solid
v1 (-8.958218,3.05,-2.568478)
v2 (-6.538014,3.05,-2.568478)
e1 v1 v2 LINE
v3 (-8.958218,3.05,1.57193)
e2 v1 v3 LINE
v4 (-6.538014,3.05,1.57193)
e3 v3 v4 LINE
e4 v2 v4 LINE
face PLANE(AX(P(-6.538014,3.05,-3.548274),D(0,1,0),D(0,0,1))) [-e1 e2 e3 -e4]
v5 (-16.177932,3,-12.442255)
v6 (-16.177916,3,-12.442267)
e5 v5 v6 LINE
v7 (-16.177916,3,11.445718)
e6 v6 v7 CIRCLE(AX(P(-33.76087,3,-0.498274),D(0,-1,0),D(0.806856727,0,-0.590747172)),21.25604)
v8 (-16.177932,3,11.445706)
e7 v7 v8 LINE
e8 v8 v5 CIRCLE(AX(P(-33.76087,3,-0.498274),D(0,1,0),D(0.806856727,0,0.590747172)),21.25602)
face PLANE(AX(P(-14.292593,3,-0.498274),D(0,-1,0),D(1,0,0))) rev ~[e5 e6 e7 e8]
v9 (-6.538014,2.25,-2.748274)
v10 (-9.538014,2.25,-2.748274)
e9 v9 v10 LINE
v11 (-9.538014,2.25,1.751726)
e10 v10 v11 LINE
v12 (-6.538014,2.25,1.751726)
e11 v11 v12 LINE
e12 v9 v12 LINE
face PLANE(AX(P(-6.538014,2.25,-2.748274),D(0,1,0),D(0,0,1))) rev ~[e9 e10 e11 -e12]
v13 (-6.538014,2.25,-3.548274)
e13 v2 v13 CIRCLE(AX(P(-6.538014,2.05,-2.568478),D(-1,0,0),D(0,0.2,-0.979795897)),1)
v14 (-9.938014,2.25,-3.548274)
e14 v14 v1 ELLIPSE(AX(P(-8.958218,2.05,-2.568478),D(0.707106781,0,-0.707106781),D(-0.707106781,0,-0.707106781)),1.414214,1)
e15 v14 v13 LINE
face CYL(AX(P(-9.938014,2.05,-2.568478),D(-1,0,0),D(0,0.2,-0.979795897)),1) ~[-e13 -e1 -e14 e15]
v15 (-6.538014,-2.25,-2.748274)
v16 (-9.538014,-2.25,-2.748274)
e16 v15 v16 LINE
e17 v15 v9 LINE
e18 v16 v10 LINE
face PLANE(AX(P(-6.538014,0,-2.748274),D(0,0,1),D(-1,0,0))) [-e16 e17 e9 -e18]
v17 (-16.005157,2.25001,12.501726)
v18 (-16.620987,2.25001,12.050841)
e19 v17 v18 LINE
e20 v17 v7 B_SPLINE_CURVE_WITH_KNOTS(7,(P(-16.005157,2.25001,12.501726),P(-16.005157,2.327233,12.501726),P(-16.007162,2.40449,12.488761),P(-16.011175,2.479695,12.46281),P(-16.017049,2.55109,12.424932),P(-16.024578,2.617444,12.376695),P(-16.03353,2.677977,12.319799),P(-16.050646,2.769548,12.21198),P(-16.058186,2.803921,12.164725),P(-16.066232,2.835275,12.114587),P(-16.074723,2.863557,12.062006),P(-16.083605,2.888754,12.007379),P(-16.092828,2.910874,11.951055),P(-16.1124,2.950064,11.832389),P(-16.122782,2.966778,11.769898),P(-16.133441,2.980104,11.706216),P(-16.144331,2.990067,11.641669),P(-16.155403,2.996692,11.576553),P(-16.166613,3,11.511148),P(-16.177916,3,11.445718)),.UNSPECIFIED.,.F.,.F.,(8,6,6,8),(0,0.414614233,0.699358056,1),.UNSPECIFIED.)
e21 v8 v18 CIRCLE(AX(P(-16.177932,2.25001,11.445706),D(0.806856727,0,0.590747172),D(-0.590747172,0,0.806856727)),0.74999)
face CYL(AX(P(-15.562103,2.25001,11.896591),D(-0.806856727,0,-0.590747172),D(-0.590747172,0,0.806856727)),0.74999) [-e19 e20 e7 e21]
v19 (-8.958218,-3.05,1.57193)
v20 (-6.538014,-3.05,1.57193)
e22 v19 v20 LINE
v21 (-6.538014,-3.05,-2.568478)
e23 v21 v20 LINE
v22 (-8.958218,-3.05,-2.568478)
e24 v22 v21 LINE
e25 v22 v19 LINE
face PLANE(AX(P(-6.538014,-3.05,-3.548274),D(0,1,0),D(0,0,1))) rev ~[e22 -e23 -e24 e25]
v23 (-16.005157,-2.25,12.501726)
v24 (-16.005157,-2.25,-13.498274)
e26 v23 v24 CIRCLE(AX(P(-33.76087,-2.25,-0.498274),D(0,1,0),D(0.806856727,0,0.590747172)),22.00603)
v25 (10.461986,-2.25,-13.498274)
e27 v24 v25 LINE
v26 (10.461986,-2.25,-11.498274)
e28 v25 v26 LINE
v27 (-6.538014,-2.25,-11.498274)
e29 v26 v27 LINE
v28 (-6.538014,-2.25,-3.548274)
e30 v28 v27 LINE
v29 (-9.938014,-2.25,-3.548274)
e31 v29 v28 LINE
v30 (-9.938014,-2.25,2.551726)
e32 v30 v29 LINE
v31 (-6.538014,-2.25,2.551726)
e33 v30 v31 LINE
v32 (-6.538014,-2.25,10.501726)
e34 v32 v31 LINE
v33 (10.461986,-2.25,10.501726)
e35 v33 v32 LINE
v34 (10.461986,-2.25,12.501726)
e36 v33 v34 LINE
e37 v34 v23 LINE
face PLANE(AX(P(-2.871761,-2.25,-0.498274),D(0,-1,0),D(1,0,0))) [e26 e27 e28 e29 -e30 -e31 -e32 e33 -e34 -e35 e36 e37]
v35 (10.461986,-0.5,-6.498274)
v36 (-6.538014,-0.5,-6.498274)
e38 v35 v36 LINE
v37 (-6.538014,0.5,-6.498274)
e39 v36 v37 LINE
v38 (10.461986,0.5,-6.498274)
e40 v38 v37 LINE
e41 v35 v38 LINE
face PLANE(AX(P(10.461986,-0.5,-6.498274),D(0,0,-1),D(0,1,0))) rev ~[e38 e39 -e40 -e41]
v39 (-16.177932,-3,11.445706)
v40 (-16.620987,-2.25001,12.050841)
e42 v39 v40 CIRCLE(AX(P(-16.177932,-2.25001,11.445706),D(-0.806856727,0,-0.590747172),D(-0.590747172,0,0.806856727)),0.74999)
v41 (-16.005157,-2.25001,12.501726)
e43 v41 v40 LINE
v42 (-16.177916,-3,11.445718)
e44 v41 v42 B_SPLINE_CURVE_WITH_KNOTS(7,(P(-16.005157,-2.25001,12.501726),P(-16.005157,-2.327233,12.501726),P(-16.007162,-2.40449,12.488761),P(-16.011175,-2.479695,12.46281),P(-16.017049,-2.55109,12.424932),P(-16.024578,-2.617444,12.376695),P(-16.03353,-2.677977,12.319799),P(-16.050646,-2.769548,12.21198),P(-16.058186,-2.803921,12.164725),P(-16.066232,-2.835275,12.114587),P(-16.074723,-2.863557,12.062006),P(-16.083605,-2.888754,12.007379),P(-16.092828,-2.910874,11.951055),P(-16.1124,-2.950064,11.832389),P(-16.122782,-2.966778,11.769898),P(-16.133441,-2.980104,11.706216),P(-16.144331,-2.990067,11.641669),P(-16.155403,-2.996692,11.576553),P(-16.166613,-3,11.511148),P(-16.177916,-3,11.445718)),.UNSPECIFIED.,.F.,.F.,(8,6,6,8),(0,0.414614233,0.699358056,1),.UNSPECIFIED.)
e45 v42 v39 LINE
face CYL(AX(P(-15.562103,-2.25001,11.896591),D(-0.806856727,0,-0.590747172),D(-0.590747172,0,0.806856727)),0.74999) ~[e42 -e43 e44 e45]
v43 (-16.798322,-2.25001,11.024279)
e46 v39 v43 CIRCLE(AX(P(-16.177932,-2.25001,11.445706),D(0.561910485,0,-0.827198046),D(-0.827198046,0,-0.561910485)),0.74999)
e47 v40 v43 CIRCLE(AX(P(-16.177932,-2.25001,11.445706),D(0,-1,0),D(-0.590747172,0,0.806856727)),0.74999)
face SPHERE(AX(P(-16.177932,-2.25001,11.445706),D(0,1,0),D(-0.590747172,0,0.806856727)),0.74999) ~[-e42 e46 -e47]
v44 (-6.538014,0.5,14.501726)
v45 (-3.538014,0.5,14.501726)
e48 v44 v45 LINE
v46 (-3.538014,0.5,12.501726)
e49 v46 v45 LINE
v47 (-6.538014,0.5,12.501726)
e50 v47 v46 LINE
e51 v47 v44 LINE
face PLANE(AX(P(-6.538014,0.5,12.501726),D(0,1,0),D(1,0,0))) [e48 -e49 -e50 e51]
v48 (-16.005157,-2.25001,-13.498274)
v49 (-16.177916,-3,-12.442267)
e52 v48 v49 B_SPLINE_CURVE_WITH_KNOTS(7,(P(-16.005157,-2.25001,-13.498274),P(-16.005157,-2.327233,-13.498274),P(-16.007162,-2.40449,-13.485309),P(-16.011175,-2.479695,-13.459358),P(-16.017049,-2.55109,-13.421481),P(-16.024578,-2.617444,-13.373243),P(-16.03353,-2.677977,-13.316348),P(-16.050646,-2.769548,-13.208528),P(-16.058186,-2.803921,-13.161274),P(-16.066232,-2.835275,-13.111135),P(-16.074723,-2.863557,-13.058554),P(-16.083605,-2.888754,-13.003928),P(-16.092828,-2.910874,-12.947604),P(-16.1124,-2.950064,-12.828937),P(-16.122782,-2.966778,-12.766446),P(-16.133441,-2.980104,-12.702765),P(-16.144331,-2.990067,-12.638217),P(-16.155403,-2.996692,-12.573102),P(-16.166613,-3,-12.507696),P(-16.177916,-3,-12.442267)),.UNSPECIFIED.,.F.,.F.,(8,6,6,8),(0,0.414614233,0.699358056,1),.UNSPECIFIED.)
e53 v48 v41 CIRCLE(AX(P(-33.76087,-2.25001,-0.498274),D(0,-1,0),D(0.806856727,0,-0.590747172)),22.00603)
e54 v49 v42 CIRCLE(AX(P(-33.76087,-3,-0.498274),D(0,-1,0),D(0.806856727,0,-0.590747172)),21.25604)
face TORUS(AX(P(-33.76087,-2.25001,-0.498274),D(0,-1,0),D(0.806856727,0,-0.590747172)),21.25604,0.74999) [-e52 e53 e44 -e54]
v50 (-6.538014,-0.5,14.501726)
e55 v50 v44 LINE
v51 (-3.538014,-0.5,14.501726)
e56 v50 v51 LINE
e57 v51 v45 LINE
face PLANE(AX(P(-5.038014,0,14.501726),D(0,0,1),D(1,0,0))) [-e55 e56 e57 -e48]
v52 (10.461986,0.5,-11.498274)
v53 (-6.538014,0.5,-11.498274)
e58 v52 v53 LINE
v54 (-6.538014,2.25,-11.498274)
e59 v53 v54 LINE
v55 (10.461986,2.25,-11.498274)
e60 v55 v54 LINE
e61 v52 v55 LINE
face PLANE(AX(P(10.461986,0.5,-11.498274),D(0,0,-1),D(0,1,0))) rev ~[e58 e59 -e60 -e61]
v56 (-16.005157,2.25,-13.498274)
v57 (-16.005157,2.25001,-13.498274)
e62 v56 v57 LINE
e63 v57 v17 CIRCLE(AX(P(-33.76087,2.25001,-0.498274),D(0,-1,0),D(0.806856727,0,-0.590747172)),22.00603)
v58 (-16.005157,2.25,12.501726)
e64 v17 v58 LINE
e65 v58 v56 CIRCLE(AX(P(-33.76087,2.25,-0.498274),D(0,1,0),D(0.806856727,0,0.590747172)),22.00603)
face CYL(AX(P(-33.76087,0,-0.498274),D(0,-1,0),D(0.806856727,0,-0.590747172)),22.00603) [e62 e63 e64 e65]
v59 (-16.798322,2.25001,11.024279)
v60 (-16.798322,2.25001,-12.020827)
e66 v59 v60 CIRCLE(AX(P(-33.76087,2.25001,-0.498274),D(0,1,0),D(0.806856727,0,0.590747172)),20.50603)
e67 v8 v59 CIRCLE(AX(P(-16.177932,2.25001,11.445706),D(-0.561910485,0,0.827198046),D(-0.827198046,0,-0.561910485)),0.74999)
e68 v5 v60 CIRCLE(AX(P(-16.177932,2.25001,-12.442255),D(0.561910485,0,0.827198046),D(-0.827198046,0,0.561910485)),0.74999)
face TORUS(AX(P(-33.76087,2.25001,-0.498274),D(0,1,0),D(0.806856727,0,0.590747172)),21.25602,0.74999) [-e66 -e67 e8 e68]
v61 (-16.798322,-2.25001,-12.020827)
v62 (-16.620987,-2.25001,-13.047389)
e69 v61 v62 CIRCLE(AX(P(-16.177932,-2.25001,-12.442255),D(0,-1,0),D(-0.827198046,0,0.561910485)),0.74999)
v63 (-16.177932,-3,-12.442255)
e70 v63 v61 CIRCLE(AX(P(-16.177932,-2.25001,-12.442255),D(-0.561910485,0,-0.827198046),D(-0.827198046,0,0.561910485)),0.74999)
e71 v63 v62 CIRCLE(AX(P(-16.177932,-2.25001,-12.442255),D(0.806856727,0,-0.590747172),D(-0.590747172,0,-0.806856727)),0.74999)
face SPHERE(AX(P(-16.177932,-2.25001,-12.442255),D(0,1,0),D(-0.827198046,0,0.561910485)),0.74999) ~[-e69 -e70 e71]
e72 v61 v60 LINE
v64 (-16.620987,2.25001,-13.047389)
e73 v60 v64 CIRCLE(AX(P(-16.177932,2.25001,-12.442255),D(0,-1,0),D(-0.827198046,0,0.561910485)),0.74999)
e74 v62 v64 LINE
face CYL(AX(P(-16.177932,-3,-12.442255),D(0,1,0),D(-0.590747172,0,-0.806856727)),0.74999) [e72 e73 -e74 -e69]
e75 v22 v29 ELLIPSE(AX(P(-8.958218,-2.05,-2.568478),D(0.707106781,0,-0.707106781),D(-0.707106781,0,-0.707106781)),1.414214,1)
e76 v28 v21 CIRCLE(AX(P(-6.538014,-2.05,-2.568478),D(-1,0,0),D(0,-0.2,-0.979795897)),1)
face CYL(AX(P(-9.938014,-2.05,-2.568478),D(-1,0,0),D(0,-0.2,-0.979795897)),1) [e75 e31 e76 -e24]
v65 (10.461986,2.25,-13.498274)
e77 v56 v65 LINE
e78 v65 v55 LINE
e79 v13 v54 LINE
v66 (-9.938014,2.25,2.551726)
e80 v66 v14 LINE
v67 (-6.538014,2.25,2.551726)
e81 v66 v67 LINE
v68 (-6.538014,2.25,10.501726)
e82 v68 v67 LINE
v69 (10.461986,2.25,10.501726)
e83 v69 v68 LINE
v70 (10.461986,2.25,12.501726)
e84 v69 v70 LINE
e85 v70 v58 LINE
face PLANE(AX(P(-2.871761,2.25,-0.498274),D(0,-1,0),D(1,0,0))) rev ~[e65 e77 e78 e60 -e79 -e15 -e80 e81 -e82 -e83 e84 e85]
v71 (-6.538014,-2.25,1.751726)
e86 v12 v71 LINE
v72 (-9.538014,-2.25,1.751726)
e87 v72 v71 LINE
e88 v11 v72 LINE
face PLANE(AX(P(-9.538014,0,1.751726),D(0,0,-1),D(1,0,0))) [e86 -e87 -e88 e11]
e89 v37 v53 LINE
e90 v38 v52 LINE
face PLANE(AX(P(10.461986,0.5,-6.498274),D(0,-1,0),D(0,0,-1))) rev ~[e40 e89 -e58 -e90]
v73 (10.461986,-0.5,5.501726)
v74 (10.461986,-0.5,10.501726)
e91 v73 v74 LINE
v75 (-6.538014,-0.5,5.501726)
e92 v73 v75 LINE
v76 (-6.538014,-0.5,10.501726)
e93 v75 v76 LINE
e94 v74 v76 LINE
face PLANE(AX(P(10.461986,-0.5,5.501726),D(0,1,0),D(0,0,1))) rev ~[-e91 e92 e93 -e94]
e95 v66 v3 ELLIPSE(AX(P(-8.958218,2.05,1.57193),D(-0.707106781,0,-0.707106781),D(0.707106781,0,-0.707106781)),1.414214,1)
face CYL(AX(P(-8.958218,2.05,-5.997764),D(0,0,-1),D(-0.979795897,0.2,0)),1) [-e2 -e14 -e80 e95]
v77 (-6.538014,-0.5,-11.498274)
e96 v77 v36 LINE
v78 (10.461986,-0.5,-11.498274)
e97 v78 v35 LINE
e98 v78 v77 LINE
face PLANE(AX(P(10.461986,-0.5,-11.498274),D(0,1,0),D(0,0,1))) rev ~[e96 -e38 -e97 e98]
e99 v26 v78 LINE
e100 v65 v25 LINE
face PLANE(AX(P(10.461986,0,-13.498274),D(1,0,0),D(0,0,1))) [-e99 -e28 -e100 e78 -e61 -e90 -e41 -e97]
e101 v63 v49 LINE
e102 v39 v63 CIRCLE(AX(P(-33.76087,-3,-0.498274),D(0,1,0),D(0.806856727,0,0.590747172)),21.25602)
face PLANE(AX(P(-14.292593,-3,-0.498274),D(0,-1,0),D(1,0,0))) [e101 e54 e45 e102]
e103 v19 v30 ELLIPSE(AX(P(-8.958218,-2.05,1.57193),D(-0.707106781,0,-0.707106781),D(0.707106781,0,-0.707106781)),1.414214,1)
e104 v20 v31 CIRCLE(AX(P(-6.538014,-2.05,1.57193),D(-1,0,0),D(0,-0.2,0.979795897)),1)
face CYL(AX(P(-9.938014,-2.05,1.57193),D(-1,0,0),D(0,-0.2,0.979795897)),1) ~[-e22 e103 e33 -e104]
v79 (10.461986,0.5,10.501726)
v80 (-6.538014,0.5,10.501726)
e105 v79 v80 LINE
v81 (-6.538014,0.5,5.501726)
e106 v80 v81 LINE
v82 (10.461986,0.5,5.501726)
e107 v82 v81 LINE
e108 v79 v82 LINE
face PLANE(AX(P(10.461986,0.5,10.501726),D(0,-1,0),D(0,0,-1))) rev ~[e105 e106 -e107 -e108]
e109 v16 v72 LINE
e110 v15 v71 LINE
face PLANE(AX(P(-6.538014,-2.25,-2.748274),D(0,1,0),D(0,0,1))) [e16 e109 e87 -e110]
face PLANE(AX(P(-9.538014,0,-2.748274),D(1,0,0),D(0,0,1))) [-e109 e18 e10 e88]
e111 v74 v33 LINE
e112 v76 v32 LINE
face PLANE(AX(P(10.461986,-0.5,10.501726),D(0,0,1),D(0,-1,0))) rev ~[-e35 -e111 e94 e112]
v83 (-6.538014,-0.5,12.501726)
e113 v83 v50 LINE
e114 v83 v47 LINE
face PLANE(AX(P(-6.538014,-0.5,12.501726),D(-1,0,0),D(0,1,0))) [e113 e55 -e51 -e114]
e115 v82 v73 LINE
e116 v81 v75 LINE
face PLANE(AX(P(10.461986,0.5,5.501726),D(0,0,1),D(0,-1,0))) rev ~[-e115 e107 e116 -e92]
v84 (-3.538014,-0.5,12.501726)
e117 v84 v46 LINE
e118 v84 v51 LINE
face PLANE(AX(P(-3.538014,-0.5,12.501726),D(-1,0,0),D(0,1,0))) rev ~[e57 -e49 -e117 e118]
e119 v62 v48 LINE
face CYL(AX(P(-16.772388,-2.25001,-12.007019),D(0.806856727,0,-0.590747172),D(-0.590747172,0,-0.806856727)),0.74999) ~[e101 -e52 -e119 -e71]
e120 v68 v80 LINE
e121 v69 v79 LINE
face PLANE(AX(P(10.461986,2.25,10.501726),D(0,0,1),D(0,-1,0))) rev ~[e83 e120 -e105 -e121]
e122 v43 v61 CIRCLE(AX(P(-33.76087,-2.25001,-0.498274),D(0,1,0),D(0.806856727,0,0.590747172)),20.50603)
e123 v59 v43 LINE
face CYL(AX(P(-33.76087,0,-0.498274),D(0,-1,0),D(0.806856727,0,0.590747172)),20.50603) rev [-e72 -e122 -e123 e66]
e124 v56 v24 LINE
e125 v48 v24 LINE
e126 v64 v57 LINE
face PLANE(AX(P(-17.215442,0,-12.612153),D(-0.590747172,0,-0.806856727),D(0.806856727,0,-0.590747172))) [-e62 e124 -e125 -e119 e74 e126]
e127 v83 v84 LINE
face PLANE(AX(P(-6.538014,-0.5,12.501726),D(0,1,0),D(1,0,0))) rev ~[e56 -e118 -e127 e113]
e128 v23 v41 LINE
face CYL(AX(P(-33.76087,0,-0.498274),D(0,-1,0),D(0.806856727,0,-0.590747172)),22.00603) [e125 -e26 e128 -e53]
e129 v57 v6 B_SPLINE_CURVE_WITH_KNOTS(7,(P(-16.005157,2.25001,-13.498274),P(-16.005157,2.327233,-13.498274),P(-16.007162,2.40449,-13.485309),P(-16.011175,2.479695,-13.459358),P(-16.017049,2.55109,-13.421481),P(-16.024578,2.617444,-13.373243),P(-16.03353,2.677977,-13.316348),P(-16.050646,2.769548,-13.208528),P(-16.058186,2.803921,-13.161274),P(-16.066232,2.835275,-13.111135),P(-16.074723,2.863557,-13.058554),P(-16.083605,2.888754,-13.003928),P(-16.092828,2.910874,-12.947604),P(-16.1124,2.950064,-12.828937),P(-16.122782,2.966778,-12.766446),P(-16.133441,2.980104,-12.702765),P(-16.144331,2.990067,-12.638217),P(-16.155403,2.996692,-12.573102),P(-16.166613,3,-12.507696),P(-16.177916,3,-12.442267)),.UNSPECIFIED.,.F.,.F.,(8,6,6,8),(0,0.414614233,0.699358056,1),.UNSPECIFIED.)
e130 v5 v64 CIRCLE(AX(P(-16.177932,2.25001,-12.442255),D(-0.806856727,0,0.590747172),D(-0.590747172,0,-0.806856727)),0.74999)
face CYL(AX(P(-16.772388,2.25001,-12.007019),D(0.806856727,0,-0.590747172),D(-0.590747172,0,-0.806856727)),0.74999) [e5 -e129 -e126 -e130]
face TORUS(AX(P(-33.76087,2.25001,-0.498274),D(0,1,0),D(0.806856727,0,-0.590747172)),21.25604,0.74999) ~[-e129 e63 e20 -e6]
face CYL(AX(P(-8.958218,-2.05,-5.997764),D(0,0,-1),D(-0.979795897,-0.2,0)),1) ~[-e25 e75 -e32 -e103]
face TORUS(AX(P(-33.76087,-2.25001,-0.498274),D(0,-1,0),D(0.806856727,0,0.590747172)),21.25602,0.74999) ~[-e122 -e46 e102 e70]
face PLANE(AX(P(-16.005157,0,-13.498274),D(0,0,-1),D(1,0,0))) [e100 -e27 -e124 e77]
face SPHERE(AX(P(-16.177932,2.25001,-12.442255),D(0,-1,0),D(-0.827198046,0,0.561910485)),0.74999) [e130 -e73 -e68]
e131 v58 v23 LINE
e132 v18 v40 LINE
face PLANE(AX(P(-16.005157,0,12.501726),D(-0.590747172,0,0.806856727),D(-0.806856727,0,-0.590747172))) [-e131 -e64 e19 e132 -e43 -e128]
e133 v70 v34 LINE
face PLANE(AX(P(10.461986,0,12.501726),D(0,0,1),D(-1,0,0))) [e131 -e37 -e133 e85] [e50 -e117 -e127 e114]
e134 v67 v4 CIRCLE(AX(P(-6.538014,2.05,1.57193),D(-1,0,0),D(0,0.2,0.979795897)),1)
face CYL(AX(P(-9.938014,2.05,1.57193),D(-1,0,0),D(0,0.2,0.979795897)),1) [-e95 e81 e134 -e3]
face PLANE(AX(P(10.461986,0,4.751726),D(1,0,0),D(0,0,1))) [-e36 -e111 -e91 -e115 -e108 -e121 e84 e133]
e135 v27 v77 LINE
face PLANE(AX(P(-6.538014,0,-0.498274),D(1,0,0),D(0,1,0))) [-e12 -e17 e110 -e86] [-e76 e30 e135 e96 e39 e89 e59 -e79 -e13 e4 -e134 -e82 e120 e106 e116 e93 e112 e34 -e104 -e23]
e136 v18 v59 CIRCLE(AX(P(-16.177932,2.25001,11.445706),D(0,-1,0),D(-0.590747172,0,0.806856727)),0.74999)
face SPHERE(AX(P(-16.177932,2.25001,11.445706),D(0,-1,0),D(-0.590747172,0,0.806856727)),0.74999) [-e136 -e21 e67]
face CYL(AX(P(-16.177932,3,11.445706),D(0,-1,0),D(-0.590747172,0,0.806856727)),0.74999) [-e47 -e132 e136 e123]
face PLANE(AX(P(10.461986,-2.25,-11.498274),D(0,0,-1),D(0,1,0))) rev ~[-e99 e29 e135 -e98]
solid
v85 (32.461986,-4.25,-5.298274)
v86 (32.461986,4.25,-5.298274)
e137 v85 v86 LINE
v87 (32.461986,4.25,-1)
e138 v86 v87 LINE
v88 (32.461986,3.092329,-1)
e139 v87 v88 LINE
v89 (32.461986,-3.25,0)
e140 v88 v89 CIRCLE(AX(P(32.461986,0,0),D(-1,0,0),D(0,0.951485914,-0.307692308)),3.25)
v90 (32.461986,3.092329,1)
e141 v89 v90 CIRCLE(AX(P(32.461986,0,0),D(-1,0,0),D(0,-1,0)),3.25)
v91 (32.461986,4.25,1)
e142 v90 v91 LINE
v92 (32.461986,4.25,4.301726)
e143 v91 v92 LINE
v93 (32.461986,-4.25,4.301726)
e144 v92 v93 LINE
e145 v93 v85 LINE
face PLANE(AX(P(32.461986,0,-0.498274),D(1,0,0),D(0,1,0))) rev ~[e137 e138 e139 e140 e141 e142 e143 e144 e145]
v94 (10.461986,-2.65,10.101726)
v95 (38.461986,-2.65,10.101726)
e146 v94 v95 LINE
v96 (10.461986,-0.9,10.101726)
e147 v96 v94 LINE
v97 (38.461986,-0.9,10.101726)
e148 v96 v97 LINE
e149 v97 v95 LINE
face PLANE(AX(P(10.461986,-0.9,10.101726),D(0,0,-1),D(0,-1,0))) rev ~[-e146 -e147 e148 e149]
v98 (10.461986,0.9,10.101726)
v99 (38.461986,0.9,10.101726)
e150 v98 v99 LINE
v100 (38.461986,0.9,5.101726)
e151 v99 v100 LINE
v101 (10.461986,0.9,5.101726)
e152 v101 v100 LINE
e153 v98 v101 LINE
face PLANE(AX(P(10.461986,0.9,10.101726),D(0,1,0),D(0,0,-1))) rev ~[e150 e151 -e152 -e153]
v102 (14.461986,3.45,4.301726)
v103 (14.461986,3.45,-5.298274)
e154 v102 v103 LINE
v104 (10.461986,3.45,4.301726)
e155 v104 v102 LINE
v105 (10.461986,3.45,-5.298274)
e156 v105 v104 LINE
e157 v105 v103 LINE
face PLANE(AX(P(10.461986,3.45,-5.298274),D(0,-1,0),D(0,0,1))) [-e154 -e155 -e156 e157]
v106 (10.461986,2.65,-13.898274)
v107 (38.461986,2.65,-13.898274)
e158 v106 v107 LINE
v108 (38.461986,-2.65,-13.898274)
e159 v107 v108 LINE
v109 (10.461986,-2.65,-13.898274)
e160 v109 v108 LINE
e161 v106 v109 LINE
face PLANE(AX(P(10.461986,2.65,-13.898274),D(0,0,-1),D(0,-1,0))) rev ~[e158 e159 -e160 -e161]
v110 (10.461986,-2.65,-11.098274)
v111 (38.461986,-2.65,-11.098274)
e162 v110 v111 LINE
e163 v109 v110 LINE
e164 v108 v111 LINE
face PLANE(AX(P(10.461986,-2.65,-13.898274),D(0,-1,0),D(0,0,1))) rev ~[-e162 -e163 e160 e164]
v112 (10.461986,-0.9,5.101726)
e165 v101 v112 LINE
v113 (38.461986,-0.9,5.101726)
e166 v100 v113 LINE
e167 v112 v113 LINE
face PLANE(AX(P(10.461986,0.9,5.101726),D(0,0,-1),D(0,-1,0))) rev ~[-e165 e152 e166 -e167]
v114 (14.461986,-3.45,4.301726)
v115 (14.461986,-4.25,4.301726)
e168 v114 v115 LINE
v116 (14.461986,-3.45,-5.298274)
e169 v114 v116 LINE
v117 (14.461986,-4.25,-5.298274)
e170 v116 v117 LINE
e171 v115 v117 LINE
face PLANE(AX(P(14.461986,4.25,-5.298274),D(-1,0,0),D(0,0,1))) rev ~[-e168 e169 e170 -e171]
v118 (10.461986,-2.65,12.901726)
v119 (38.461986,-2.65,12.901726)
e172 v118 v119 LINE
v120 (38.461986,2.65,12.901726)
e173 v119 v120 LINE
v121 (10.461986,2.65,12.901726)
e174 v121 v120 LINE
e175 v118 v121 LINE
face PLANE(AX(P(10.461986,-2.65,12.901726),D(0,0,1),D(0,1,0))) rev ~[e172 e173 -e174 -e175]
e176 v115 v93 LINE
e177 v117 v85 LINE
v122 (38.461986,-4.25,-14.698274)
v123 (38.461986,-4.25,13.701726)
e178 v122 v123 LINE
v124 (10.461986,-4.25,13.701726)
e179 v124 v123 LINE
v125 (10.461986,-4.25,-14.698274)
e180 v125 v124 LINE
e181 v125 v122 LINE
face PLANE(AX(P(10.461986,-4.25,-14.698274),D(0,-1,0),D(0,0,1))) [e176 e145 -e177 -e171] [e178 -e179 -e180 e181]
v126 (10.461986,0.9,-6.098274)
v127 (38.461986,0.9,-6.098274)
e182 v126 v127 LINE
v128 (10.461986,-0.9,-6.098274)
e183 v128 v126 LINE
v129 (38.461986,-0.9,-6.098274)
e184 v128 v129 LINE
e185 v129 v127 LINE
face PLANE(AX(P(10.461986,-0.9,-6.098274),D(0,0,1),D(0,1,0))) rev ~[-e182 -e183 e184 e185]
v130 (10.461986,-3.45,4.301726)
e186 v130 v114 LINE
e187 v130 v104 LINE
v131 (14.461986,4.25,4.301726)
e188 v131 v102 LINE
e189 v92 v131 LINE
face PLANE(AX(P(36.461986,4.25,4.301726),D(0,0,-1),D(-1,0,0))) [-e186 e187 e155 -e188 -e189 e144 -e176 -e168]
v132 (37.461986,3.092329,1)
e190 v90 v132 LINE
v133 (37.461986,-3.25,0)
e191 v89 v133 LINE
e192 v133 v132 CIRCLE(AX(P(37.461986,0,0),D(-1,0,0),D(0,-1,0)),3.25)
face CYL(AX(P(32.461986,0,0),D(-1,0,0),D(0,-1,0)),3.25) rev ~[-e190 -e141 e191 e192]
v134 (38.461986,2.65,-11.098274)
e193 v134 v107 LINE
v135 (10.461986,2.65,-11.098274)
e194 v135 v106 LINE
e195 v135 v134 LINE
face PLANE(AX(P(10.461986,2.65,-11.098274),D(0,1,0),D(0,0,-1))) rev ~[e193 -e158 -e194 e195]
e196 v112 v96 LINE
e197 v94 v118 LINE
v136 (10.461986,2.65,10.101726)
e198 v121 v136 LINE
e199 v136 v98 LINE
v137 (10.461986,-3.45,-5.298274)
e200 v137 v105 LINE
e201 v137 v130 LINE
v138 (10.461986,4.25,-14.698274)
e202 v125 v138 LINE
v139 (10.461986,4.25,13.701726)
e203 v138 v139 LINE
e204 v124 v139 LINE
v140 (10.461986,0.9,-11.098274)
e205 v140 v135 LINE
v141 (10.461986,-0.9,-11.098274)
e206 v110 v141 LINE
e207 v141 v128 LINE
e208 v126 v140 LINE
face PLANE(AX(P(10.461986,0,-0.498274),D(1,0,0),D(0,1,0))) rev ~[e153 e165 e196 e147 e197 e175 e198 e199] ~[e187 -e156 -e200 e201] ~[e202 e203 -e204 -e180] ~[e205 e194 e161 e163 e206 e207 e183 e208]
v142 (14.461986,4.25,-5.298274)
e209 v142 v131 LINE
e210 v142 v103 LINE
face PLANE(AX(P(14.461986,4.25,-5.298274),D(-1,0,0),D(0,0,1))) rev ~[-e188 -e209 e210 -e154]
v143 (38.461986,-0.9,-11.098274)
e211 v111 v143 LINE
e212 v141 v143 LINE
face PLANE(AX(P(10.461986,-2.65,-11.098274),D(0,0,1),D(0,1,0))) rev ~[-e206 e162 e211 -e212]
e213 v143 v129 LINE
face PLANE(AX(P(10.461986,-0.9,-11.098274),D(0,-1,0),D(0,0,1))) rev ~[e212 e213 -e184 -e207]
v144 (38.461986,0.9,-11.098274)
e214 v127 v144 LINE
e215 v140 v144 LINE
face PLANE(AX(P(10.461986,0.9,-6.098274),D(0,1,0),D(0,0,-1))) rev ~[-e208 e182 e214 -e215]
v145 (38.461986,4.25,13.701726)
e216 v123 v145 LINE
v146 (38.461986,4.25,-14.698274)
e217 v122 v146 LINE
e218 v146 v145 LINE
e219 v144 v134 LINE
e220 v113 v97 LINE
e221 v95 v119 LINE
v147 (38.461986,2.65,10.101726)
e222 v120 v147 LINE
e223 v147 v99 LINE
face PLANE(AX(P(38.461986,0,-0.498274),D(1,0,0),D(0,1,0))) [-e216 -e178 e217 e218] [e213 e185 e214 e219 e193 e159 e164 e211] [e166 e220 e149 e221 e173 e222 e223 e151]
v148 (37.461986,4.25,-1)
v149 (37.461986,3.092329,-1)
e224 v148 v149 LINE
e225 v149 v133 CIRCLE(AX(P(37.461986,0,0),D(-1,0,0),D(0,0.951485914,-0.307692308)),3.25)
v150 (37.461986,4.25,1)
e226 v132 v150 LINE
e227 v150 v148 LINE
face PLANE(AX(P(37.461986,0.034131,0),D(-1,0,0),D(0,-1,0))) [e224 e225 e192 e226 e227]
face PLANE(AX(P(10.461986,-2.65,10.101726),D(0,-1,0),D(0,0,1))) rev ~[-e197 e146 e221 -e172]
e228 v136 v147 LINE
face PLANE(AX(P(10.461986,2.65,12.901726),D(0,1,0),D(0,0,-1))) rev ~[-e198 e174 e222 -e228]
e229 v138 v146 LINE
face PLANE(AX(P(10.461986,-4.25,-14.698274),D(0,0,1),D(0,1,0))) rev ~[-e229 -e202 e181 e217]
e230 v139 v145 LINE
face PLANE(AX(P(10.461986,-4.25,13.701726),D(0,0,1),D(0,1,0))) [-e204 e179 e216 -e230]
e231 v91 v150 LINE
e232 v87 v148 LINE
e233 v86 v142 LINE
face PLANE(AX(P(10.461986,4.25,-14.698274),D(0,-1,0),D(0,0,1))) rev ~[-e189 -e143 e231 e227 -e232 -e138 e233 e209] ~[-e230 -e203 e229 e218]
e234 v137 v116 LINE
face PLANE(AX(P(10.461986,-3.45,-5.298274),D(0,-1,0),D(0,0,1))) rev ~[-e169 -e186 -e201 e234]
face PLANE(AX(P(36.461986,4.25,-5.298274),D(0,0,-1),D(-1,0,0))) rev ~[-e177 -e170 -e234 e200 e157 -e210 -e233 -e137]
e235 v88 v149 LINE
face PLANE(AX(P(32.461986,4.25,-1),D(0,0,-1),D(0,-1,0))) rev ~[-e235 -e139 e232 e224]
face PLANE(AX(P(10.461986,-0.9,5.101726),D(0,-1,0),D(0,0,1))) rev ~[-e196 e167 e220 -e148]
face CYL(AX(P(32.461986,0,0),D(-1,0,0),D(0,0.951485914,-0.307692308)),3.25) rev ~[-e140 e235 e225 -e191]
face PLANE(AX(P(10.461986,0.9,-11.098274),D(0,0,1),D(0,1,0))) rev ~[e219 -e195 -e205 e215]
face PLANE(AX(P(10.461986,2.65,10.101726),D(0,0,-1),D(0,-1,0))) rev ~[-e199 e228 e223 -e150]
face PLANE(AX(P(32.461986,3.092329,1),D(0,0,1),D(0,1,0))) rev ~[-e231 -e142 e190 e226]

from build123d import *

# Parameters (mm, degrees)
F1_DEPTH    = 2.25
F2_W        = 6.1
F2_H        = 6.1
F2_W_2      = 4.5
F2_H_2      = 4.5
F3_DEPTH    = 3.4
F5_DEPTH    = 3
F6_R        = 0.74999
F7_T1_DEPTH = 10.9989794856
F7_T3_DEPTH = 5.8494897428
F9_DEPTH    = 17
F10_W       = 3
F10_H       = 1
F11_DEPTH   = 2
F12_W       = 8.5
F12_H       = 28.4
F12_W_2     = 6.9
F12_H_2     = 9.6
F13_DEPTH   = 28
F15_W       = 22
F15_H       = 9.6
F16_DEPTH   = 15.5
F17_DEPTH   = 6
F19_DEPTH   = 5


# Not quite as in the source:
# - a fillet or chamfer that OpenCascade refuses, or shapes differently, is made with other operations: its cross-section is extruded or revolved along the edge and cut away or added
# - a fillet or chamfer is up to 0.001 mm smaller than in the source, because OpenCascade refuses the exact size


with BuildPart() as f1:
    # F0 (on Front) → F1 (new body, symmetric)
    with BuildSketch(Plane.XZ):
        with BuildLine():
            Line((-9.5380139407, -2.7482741908), (-9.5380139407, 1.7517258092))
            Line((-9.5380139407, 1.7517258092), (-6.5380139407, 1.7517258092))
            Line((-6.5380139407, 1.7517258092), (-6.5380139407, 4.7517258092))
            Line((-6.5380139407, 4.7517258092), (10.4619860593, 4.7517258092))
            Line((10.4619860593, 4.7517258092), (10.4619860593, 12.5017258092))
            Line((10.4619860593, 12.5017258092), (-16.0051570773, 12.5017258092))
            ThreePointArc((-16.0051570773, 12.5017258092), (-11.7548404249, -0.4982741908), (-16.0051570773, -13.4982741908))
            Line((-16.0051570773, -13.4982741908), (10.4619860593, -13.4982741908))
            Line((10.4619860593, -13.4982741908), (10.4619860593, -5.7482741908))
            Line((10.4619860593, -5.7482741908), (-6.5380139407, -5.7482741908))
            Line((-6.5380139407, -5.7482741908), (-6.5380139407, -2.7482741908))
            Line((-6.5380139407, -2.7482741908), (-9.5380139407, -2.7482741908))
        make_face()
    extrude(amount=F1_DEPTH, both=True)

    # F2 (on face) → F3 (join)
    with BuildSketch(Plane.YZ.offset(-6.5380139407)):
        with Locations((0, -0.4982741908)):
            Rectangle(F2_W, F2_H)
        with Locations((0, -0.4982741908)):
            Rectangle(F2_W_2, F2_H_2, mode=Mode.SUBTRACT)
    extrude(amount=-F3_DEPTH)

    # F4 (on Front) → F5 (join, symmetric)
    with BuildSketch(Plane.XZ):
        with BuildLine():
            ThreePointArc((-16.0051570773, -13.4982741908), (-11.7548404249, -0.4982741908), (-16.0051570773, 12.5017258092))
            Line((-16.0051570773, 12.5017258092), (-17.2154421685, 11.6156050511))
            ThreePointArc((-17.2154421685, 11.6156050511), (-13.2548404249, -0.4982741908), (-17.2154421685, -12.6121534326))
            Line((-17.2154421685, -12.6121534326), (-16.0051570773, -13.4982741908))
        make_face()
    extrude(amount=F5_DEPTH, both=True)

    # F6 (radius 0.75 in the source; OpenCascade refuses exactly that, so slightly less here)
    f6_edges = [f1.edges().sort_by_distance(p)[0] for p in [
        (-16.6103, -3, 12.058665),
        (-13.25484, -3, -0.498274),
        (-16.6103, -3, -13.055214),
        (-11.75484, -3, -0.498274),
        (-16.6103, 3, 12.058665),
        (-13.25484, 3, -0.498274),
        (-16.6103, 3, -13.055214),
        (-11.75484, 3, -0.498274),
        (-17.215442, 0, -12.612153),
        (-17.215442, 0, 11.615605),
    ]]
    fillet(f6_edges, radius=F6_R)

    # F7: fillet of radius 1 on 6 edges, made by hand

    # F7_s2 → F7_t1 (cut)
    with BuildSketch(Plane.XY.offset(-5.9977639336)):
        with BuildLine():
            ThreePointArc((-9.9380139407, -2.25), (-9.5906735756, -2.8245966692), (-8.9582180436, -3.05))
            Line((-8.9582180436, -3.05), (-9.9380139407, -3.05))
            Line((-9.9380139407, -3.05), (-9.9380139407, -2.25))
        make_face()
        with BuildLine():
            ThreePointArc((-9.9380139407, 2.25), (-9.5906735756, 2.8245966692), (-8.9582180436, 3.05))
            Line((-8.9582180436, 3.05), (-9.9380139407, 3.05))
            Line((-9.9380139407, 3.05), (-9.9380139407, 2.25))
        make_face()
    extrude(amount=F7_T1_DEPTH, mode=Mode.SUBTRACT)

    # F7_s4 → F7_t3 (cut)
    with BuildSketch(Plane.YZ.offset(-9.9380139407)):
        with BuildLine():
            ThreePointArc((-2.25, -3.5482741908), (-2.8245966692, -3.2009338257), (-3.05, -2.5684782937))
            Line((-3.05, -2.5684782937), (-3.05, -3.5482741908))
            Line((-3.05, -3.5482741908), (-2.25, -3.5482741908))
        make_face()
        with BuildLine():
            ThreePointArc((-2.25, 2.5517258092), (-2.8245966692, 2.2043854441), (-3.05, 1.5719299121))
            Line((-3.05, 1.5719299121), (-3.05, 2.5517258092))
            Line((-3.05, 2.5517258092), (-2.25, 2.5517258092))
        make_face()
        with BuildLine():
            ThreePointArc((2.25, 2.5517258092), (2.8245966692, 2.2043854441), (3.05, 1.5719299121))
            Line((3.05, 1.5719299121), (3.05, 2.5517258092))
            Line((3.05, 2.5517258092), (2.25, 2.5517258092))
        make_face()
        with BuildLine():
            ThreePointArc((2.25, -3.5482741908), (2.8245966692, -3.2009338257), (3.05, -2.5684782937))
            Line((3.05, -2.5684782937), (3.05, -3.5482741908))
            Line((3.05, -3.5482741908), (2.25, -3.5482741908))
        make_face()
    extrude(amount=F7_T3_DEPTH, mode=Mode.SUBTRACT)

    # F8 (on face) → F9 (cut, through all)
    with BuildSketch(Plane.YZ.offset(10.4619860593)):
        Polygon((-2.25, 10.5017258092), (-2.25, 4.7517258092), (2.25, 4.7517258092), (2.25, 10.5017258092), (0.5, 10.5017258092), (0.5, 5.5017258092), (-0.5, 5.5017258092), (-0.5, 10.5017258092), align=None)
        Polygon((2.25, -11.4982741908), (2.25, -5.7482741908), (-2.25, -5.7482741908), (-2.25, -11.4982741908), (-0.5, -11.4982741908), (-0.5, -6.4982741908), (0.5, -6.4982741908), (0.5, -11.4982741908), align=None)
    extrude(amount=-F9_DEPTH, mode=Mode.SUBTRACT)

    # F10 (on face) → F11 (join)
    with BuildSketch(Plane.XY.offset(12.5017258092)):
        with Locations((-5.0380139407, 0)):
            Rectangle(F10_W, F10_H)
    extrude(amount=F11_DEPTH)


with BuildPart() as f13:
    # F12 (on face) → F13 (new body)
    with BuildSketch(Plane.YZ.offset(10.4619860593)):
        with Locations((0, -0.4982741908)):
            Rectangle(F12_W, F12_H)
        Polygon((-0.9, -6.0982741908), (0.9, -6.0982741908), (0.9, -11.0982741908), (2.65, -11.0982741908), (2.65, -13.8982741908), (-2.65, -13.8982741908), (-2.65, -11.0982741908), (-0.9, -11.0982741908), align=None, mode=Mode.SUBTRACT)
        with Locations((0, -0.4982741908)):
            Rectangle(F12_W_2, F12_H_2, mode=Mode.SUBTRACT)
        Polygon((0.9, 10.1017258092), (0.9, 5.1017258092), (-0.9, 5.1017258092), (-0.9, 10.1017258092), (-2.65, 10.1017258092), (-2.65, 12.9017258092), (2.65, 12.9017258092), (2.65, 10.1017258092), align=None, mode=Mode.SUBTRACT)
    extrude(amount=F13_DEPTH)

    # F15 (on face) → F16 (cut)
    with BuildSketch(Plane(origin=(0, 4.25, 0), x_dir=(-1, 0, 0), z_dir=(0, 1, 0))):
        with Locations((-25.4619860593, -0.4982741908)):
            Rectangle(F15_W, F15_H)
    extrude(amount=-F16_DEPTH, mode=Mode.SUBTRACT)

    # F14 (on face) → F17 (join)
    with BuildSketch(Plane.YZ.offset(38.4619860593)):
        Polygon((3.45, 4.3017258092), (-3.45, 4.3017258092), (-4.25, 4.3017258092), (-4.25, -5.2982741908), (-3.45, -5.2982741908), (3.45, -5.2982741908), (4.25, -5.2982741908), (4.25, 4.3017258092), align=None)
    extrude(amount=-F17_DEPTH)

    # F18 (on face) → F19 (cut)
    with BuildSketch(Plane(origin=(32.4619860593, 0, 0), x_dir=(0, -1, 0), z_dir=(-1, 0, 0))):
        with BuildLine():
            ThreePointArc((-3.0923292192, -1), (0.5061768651, -3.2103403217), (3.25, 0))
            ThreePointArc((3.25, 0), (0.5061768651, 3.2103403217), (-3.0923292192, 1))
            ThreePointArc((-3.0923292192, 1), (-3.25, 0), (-3.0923292192, -1))
        make_face()
        with BuildLine():
            ThreePointArc((-3.0923292192, -1), (-3.25, 0), (-3.0923292192, 1))
            Line((-3.0923292192, 1), (-4.25, 1))
            Line((-4.25, 1), (-4.25, -1))
            Line((-4.25, -1), (-3.0923292192, -1))
        make_face()
    extrude(amount=-F19_DEPTH, mode=Mode.SUBTRACT)


solid = Compound([f1.part, f13.part])
